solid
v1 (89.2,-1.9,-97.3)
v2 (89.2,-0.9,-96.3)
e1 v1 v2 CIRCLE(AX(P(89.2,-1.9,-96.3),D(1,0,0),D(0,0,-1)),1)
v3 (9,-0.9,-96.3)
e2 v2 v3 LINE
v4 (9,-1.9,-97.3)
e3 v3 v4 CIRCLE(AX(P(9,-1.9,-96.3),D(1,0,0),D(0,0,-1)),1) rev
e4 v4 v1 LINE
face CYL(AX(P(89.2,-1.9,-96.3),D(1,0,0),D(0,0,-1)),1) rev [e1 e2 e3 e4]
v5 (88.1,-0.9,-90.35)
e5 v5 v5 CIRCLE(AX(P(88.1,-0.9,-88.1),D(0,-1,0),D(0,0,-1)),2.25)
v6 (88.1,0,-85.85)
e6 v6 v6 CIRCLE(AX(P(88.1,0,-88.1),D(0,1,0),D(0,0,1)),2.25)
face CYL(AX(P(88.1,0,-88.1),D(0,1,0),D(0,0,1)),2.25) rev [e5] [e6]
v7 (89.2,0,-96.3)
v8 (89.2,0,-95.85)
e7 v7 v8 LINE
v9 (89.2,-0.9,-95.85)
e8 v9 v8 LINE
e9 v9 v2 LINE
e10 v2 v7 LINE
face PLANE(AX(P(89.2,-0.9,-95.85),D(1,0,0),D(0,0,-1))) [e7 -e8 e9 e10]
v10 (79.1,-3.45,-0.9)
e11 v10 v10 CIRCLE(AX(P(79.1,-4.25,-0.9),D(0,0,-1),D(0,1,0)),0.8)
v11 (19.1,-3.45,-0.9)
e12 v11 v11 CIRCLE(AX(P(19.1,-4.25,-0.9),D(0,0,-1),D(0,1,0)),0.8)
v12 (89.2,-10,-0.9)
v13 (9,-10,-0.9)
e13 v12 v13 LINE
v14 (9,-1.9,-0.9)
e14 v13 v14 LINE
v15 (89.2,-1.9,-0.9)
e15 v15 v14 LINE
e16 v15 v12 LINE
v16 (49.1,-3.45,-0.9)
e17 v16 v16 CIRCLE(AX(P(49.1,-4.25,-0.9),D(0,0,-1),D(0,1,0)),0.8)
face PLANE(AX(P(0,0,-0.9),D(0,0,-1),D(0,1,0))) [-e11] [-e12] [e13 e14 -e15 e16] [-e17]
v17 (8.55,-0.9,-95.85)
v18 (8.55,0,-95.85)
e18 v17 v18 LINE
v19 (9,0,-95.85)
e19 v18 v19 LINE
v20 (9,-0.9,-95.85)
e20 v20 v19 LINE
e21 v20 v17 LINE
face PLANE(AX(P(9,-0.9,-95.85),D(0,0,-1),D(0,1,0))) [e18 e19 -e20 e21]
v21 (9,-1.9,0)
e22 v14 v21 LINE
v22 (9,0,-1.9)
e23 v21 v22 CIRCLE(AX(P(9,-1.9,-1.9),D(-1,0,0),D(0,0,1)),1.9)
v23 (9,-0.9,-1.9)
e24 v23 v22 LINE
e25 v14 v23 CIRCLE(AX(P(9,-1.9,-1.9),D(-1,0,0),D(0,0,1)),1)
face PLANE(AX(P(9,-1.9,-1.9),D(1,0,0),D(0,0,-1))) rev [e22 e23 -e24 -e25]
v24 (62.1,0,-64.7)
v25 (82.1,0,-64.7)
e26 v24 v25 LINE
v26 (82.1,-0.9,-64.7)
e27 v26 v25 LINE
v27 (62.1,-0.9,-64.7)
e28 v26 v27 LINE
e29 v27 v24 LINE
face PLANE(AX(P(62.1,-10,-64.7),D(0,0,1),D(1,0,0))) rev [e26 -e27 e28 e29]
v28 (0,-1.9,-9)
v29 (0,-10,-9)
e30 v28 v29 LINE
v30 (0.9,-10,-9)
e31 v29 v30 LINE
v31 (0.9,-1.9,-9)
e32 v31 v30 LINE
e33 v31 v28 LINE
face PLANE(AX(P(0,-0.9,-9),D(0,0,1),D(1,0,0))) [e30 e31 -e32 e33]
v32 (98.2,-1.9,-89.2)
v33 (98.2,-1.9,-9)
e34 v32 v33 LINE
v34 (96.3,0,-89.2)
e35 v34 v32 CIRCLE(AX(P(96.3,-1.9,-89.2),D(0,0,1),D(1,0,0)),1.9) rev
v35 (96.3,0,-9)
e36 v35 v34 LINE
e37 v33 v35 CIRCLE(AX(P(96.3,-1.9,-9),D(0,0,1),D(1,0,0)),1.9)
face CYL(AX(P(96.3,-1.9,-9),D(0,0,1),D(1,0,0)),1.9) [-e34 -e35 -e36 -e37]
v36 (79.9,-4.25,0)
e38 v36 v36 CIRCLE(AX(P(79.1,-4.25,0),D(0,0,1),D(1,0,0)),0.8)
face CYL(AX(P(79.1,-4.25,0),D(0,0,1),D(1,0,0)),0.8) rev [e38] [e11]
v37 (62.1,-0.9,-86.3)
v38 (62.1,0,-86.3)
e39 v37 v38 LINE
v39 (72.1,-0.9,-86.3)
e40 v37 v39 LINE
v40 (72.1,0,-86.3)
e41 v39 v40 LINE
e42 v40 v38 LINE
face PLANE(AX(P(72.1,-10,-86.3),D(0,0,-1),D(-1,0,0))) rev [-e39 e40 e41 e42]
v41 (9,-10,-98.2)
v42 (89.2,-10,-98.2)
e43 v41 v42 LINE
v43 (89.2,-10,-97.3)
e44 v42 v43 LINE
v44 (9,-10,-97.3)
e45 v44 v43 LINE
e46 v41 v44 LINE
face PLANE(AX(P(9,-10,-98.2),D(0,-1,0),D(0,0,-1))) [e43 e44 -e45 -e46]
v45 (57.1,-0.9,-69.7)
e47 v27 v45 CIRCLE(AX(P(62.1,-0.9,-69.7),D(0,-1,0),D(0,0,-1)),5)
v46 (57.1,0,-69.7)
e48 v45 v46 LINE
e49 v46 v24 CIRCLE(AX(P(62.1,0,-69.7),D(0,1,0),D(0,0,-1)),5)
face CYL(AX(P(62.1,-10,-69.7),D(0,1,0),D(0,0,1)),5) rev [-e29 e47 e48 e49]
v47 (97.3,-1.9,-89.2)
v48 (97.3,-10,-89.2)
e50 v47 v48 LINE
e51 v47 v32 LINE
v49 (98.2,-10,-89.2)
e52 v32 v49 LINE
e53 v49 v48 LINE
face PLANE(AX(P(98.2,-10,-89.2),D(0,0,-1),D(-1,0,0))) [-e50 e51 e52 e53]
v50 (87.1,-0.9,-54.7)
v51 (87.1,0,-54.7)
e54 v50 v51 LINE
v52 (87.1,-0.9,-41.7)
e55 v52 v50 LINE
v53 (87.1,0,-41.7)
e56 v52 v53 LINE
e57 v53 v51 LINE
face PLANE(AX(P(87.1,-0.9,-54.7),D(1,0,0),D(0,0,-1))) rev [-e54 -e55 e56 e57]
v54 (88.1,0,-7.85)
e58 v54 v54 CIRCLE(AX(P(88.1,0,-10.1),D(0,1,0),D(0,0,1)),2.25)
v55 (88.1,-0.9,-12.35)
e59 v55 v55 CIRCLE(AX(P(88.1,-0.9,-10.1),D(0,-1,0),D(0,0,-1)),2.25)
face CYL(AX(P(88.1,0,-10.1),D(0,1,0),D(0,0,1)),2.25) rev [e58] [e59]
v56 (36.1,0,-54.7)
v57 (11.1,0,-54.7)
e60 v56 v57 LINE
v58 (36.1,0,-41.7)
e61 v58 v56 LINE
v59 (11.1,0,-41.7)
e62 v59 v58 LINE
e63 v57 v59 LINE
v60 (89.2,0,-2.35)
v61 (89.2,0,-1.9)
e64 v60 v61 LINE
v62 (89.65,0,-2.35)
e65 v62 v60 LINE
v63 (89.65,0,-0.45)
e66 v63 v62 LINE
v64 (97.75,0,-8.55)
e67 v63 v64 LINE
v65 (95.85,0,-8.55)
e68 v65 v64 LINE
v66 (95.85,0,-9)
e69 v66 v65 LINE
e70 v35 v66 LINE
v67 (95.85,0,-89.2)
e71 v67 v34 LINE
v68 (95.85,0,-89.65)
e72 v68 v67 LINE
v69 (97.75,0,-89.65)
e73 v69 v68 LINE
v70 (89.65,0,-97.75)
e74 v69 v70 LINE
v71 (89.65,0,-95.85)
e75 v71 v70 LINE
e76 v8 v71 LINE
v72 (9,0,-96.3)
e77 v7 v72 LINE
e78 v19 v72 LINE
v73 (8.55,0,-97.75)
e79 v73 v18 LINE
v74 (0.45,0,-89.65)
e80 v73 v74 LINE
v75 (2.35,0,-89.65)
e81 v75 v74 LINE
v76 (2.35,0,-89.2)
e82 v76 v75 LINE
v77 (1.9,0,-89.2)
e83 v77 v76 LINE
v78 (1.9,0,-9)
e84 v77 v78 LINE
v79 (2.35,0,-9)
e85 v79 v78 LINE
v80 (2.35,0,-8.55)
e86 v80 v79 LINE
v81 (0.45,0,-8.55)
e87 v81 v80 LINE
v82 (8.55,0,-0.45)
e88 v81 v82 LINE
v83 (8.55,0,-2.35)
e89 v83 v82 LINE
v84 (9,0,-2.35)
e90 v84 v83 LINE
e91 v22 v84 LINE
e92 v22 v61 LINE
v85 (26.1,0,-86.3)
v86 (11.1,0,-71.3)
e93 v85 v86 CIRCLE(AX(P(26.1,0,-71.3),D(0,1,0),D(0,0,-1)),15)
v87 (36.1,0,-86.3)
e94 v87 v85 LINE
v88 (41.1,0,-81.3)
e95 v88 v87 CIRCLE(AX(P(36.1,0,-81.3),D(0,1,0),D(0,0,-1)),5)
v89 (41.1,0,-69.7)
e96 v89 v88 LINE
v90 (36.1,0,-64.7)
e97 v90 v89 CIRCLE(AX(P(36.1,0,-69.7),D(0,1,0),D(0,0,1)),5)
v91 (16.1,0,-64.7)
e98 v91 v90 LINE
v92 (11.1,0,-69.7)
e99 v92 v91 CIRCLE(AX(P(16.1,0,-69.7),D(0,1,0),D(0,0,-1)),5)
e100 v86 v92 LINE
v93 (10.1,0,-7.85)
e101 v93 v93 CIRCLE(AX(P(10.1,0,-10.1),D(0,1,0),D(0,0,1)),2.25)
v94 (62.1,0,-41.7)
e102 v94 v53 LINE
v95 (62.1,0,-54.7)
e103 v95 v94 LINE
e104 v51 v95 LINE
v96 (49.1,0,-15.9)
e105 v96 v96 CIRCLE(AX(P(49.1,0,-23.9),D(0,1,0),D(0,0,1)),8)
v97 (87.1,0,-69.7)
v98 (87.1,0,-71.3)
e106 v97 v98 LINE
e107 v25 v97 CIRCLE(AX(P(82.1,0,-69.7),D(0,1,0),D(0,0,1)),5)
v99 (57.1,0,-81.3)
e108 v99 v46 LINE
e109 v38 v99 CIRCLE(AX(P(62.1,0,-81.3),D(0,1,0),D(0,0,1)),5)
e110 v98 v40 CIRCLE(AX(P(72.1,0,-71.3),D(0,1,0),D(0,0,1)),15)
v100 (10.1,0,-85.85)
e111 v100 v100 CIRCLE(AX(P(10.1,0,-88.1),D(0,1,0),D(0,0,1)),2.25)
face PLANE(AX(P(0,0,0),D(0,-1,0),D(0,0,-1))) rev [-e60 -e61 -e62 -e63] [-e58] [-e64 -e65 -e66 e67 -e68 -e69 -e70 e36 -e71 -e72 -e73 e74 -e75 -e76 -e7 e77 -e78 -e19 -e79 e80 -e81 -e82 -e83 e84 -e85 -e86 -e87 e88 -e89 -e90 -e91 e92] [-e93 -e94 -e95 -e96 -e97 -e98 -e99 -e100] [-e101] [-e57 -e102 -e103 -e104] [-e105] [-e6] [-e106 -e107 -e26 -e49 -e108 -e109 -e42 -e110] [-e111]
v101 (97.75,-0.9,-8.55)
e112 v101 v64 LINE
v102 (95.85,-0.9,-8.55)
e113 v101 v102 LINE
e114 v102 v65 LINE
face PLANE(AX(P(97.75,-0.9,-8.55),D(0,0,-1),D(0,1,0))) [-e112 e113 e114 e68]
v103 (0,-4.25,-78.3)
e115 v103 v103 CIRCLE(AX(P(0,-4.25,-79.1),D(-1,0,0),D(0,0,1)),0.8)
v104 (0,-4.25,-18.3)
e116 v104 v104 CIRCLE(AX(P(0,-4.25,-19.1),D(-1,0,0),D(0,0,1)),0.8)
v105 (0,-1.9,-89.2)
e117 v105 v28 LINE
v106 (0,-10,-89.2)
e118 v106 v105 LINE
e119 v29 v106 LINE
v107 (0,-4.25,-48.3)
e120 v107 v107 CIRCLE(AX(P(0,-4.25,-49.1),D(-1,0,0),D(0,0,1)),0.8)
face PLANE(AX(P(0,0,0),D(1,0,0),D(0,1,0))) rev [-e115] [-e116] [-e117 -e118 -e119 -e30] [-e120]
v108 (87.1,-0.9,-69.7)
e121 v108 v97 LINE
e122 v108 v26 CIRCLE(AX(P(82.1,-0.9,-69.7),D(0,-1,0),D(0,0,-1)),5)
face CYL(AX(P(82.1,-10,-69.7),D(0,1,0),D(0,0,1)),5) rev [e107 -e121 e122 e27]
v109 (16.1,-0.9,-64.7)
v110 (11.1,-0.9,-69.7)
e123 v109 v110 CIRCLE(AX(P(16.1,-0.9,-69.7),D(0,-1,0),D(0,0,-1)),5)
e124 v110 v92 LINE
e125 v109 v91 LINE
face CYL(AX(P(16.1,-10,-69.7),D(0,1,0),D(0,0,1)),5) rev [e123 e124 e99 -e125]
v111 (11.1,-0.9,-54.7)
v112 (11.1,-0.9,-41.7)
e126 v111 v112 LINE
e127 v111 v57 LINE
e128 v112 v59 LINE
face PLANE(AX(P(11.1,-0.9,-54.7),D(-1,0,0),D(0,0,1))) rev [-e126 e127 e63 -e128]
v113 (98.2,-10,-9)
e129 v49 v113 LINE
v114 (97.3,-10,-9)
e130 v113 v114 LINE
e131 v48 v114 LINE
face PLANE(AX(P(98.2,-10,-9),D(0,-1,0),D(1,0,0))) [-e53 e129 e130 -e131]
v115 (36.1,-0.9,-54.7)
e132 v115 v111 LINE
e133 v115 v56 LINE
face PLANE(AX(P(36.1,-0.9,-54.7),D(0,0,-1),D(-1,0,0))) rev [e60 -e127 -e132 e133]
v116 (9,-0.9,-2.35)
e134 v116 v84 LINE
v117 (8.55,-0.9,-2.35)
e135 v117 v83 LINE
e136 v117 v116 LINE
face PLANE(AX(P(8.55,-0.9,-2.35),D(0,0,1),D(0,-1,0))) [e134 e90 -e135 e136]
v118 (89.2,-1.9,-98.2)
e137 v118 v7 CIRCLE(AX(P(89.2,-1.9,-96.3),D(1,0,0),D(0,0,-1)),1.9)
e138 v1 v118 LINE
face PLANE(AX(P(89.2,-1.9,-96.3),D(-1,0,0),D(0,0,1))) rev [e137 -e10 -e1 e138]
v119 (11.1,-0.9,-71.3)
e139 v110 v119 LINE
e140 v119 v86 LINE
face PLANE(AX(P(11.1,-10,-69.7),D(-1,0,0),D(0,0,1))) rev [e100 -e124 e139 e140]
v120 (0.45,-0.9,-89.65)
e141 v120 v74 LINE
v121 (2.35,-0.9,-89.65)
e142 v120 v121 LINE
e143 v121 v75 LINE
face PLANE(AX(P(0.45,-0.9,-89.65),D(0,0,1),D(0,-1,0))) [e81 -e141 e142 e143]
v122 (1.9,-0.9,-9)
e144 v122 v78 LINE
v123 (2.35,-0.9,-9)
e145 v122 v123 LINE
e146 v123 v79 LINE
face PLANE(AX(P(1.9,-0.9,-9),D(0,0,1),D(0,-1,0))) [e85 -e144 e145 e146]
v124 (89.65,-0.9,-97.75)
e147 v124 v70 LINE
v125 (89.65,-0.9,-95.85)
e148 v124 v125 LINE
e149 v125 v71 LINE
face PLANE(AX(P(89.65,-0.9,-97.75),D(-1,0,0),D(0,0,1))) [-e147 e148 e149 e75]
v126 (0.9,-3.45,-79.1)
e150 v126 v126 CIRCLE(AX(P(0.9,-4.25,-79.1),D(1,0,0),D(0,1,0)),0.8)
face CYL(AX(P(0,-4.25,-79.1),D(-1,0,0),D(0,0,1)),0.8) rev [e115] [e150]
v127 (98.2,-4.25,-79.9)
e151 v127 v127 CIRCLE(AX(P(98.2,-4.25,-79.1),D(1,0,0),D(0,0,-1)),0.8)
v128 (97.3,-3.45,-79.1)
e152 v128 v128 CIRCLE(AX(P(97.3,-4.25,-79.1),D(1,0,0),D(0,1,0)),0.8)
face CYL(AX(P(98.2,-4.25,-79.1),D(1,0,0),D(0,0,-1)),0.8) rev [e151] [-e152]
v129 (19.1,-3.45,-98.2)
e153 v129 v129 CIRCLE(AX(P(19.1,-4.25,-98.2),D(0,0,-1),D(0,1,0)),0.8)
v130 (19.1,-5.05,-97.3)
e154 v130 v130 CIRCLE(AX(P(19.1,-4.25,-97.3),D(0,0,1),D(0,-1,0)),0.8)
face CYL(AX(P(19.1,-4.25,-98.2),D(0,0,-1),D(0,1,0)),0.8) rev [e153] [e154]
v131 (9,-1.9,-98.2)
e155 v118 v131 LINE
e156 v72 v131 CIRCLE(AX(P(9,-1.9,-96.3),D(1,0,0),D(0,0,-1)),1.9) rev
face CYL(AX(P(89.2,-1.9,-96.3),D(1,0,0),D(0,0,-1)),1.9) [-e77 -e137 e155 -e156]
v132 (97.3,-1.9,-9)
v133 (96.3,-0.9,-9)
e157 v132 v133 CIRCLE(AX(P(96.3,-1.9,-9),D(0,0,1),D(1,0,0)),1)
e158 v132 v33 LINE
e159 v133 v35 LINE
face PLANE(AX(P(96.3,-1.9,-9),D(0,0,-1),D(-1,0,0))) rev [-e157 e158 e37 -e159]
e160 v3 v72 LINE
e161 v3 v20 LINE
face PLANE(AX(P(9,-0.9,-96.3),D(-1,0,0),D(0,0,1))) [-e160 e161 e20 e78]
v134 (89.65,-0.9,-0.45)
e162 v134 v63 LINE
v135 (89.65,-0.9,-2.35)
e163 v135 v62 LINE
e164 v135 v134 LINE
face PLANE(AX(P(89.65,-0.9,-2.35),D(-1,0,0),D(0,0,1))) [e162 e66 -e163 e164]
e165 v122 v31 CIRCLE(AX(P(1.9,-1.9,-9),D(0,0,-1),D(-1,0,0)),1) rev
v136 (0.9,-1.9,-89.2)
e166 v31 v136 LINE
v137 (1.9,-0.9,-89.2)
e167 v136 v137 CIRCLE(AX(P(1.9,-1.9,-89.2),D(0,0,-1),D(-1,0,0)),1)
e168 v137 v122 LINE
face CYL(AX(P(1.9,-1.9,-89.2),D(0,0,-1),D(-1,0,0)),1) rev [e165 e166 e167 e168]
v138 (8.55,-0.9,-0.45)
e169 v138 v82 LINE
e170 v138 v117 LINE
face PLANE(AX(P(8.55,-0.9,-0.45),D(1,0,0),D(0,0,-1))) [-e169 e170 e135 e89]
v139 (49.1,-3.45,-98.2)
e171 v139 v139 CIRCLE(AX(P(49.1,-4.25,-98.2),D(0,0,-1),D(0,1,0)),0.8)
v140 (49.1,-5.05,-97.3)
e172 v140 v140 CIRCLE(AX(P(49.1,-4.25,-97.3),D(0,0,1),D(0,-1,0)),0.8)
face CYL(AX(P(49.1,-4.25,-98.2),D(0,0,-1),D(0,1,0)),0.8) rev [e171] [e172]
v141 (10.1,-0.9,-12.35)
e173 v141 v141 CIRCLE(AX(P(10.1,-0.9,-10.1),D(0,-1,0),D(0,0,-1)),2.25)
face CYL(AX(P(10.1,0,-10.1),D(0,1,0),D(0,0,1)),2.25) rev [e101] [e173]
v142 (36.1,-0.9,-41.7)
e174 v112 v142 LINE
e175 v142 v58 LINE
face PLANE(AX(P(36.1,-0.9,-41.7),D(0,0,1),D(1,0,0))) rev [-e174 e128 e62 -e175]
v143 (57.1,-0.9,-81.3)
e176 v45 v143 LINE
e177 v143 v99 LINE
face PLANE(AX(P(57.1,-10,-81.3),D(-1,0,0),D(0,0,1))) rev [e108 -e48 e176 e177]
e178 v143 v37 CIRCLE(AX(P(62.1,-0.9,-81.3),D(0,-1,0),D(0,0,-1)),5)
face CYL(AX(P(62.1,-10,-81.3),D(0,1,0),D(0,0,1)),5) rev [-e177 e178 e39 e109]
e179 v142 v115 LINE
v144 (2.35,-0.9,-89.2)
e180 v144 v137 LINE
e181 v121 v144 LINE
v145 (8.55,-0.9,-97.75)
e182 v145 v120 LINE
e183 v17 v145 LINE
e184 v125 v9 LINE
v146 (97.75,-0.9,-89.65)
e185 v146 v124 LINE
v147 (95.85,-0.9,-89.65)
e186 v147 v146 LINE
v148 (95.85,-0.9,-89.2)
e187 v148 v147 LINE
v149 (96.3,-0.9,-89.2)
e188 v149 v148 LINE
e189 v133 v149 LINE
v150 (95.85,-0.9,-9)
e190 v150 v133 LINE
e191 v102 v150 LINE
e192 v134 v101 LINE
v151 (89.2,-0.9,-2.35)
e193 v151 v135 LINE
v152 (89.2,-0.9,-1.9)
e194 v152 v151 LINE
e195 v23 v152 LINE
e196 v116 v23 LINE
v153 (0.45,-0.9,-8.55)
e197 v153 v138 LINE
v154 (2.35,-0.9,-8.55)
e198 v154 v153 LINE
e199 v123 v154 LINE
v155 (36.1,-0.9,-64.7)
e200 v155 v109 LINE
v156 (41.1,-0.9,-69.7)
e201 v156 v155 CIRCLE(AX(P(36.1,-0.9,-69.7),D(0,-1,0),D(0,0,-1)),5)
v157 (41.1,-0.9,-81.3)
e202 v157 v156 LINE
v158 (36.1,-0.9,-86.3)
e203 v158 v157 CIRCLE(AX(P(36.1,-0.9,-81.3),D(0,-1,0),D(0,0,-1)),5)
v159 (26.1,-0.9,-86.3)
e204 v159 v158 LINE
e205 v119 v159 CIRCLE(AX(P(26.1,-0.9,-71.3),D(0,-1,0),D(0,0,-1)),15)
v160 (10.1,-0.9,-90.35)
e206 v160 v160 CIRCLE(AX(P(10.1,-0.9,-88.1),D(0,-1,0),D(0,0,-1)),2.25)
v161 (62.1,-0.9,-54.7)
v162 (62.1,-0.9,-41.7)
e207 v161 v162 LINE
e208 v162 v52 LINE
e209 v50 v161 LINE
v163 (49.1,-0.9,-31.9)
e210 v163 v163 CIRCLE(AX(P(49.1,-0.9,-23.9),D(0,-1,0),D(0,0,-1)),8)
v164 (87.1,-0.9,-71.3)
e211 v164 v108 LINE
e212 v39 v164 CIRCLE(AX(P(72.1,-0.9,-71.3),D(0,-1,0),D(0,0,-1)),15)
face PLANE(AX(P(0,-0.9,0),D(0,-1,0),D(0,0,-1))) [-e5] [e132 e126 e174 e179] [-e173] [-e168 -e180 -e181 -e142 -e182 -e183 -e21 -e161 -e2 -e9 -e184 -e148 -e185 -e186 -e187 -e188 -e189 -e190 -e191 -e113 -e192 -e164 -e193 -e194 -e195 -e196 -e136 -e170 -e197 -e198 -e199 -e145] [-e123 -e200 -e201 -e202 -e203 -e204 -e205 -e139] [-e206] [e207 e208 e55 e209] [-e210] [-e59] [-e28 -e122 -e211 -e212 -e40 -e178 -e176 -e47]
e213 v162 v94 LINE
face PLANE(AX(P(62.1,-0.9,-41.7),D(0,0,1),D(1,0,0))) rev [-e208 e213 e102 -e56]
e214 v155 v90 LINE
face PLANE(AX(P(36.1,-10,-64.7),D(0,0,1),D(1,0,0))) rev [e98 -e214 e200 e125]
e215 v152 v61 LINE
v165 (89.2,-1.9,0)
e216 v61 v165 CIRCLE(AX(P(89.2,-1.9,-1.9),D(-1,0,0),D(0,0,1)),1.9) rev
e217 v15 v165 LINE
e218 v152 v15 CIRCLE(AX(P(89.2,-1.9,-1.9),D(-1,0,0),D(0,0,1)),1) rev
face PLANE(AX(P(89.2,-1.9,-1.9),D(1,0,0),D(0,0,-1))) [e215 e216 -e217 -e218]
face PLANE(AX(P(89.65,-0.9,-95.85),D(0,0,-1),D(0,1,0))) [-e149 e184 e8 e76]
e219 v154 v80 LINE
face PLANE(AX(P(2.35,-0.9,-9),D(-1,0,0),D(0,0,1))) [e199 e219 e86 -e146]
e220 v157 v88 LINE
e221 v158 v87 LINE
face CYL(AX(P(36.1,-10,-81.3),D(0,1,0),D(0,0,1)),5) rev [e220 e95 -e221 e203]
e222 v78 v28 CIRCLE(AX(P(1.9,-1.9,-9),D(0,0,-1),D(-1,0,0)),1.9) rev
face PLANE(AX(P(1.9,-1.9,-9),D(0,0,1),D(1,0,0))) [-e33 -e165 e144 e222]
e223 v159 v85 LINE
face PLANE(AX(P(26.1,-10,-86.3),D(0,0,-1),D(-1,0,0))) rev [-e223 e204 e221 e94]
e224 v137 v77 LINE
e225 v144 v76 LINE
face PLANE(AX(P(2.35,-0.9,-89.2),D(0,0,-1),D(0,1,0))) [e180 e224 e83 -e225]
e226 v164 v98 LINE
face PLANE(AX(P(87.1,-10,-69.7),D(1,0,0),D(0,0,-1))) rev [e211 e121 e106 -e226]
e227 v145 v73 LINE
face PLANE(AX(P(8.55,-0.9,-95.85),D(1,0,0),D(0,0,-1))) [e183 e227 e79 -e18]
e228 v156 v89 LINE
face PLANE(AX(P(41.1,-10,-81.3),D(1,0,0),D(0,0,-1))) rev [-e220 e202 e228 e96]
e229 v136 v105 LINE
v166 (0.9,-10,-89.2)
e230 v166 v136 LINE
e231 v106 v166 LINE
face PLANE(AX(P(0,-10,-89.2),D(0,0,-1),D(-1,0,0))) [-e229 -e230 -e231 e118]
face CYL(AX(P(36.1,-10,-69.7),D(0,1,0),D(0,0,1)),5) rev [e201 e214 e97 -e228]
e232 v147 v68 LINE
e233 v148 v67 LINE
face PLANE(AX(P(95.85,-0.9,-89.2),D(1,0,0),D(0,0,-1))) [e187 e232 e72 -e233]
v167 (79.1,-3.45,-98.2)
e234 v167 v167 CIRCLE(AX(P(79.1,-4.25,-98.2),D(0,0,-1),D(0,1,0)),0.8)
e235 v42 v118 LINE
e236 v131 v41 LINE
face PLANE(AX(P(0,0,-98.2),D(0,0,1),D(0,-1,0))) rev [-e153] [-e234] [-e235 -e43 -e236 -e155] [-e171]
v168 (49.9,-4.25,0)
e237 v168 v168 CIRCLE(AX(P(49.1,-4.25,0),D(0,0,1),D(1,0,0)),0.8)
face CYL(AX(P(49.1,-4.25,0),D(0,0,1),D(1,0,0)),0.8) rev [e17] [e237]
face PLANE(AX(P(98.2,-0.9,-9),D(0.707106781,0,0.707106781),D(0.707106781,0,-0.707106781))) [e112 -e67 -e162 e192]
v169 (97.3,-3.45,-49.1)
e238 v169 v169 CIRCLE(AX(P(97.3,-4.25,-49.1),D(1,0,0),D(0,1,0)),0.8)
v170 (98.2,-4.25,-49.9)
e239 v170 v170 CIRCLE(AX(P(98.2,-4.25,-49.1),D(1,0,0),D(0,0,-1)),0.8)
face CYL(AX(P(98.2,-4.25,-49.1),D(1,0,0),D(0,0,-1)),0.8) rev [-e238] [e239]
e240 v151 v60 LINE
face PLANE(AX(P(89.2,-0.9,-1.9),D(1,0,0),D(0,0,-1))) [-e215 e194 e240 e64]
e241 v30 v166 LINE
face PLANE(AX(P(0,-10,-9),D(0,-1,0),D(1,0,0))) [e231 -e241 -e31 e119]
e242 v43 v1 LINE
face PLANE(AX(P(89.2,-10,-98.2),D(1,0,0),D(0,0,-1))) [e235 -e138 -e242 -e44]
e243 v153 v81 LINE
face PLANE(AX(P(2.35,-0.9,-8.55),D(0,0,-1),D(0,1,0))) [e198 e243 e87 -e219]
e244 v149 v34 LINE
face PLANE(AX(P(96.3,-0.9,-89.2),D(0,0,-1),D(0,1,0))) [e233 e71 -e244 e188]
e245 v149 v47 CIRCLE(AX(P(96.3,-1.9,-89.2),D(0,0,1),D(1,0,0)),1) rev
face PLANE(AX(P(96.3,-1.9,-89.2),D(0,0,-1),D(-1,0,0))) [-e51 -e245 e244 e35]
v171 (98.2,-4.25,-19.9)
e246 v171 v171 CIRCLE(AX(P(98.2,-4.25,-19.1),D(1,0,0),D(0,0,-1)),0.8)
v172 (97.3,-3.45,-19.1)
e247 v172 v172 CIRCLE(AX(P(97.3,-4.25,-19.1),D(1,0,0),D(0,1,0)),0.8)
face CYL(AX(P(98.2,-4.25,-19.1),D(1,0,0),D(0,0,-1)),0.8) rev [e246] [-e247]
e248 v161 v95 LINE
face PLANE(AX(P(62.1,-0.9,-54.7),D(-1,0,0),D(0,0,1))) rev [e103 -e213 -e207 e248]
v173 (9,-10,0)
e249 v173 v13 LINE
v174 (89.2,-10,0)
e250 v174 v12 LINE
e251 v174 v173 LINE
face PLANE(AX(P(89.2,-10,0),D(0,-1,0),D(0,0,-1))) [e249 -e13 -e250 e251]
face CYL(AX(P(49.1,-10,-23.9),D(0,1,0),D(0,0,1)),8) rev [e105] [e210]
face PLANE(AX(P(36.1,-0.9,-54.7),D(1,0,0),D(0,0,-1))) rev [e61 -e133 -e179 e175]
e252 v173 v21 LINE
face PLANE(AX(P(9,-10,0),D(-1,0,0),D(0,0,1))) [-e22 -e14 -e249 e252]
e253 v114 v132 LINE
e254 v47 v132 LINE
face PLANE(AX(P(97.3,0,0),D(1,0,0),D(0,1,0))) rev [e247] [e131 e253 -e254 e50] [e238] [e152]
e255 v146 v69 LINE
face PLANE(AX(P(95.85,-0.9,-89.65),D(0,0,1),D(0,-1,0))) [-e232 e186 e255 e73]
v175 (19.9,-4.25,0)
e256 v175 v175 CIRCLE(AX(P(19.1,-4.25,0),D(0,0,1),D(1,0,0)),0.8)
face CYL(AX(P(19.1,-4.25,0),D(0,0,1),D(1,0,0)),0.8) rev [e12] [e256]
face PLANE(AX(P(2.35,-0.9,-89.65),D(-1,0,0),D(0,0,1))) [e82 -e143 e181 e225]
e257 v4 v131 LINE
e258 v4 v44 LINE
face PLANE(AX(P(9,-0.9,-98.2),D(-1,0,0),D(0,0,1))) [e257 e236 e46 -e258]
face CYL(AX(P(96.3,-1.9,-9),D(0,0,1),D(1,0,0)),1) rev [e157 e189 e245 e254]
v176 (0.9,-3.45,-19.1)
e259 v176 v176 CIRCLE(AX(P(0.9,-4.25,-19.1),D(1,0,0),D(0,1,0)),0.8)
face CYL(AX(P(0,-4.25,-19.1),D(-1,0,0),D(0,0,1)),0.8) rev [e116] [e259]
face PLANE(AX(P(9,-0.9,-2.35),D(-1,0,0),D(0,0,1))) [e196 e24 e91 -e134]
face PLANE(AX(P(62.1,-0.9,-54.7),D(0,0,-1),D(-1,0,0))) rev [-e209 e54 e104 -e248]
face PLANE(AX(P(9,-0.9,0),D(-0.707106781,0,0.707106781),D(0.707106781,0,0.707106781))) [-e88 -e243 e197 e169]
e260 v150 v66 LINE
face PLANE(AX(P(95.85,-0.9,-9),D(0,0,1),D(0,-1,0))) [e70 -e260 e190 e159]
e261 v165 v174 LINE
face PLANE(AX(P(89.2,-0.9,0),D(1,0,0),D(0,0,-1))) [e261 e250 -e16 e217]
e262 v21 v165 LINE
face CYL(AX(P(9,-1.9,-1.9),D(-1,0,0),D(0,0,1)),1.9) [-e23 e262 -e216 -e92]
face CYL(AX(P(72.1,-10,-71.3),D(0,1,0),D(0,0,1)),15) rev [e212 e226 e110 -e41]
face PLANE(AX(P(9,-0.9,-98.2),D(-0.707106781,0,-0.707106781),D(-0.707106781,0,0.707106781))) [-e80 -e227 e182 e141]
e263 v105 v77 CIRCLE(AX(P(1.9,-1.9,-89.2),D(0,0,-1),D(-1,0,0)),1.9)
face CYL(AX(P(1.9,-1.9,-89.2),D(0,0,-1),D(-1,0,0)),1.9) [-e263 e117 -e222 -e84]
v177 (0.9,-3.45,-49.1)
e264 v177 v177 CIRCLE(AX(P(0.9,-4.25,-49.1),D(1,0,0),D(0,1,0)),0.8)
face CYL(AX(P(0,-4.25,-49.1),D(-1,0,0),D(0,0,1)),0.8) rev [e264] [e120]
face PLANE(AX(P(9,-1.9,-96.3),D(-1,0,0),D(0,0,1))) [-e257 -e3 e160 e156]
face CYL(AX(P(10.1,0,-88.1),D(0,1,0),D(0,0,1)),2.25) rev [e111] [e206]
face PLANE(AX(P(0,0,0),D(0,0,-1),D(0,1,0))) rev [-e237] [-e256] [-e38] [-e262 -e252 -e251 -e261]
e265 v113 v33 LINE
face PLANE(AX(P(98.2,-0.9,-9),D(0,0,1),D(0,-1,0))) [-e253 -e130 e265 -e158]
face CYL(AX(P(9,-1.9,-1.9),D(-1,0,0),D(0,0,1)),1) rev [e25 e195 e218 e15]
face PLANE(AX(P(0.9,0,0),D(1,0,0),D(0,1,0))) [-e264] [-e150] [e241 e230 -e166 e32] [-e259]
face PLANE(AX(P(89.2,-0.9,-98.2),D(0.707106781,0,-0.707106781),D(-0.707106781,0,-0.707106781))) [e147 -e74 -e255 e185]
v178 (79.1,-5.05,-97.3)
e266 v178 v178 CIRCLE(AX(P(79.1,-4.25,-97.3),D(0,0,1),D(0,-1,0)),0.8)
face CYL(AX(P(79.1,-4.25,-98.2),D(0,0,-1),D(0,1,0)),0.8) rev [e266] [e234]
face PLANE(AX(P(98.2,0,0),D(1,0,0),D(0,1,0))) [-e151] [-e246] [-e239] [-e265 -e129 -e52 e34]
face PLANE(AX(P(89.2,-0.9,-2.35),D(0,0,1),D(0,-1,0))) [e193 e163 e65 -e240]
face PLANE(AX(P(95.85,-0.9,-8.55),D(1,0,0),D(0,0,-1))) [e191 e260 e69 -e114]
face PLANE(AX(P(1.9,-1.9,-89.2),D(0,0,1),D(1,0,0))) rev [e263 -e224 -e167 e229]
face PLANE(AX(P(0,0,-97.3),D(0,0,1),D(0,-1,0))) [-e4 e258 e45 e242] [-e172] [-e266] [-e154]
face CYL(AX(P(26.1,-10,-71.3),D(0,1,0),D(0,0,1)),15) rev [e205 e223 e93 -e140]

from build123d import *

# Parameters (mm, degrees)
SKETCH1_W                       = 25
SKETCH1_H                       = 13
BASE_FLANGE1_DEPTH              = 0.9
EDGE_FLANGE1_STRIP_W            = 5.6
EDGE_FLANGE1_STRIP_H            = 0.9
EDGE_FLANGE1_STRIP_CUT_DEPTH    = 80.2
EDGE_FLANGE1_RELIEF_W           = 6.05
EDGE_FLANGE1_RELIEF_H           = 0.45
EDGE_FLANGE1_RELIEF_CUT_DEPTH   = 0.9
EDGE_FLANGE1_STRIP_2_W          = 5.6
EDGE_FLANGE1_STRIP_2_H          = 0.9
EDGE_FLANGE1_STRIP_CUT_2_DEPTH  = 80.2
EDGE_FLANGE1_RELIEF_2_W         = 6.05
EDGE_FLANGE1_RELIEF_2_H         = 0.45
EDGE_FLANGE1_RELIEF_CUT_2_DEPTH = 0.9
EDGE_FLANGE1_STRIP_3_W          = 5.6
EDGE_FLANGE1_STRIP_3_H          = 0.9
EDGE_FLANGE1_STRIP_CUT_3_DEPTH  = 80.2
EDGE_FLANGE1_RELIEF_3_W         = 6.05
EDGE_FLANGE1_RELIEF_3_H         = 0.45
EDGE_FLANGE1_RELIEF_CUT_3_DEPTH = 0.9
EDGE_FLANGE1_STRIP_4_W          = 5.6
EDGE_FLANGE1_STRIP_4_H          = 0.9
EDGE_FLANGE1_STRIP_CUT_4_DEPTH  = 80.2
EDGE_FLANGE1_RELIEF_4_W         = 6.05
EDGE_FLANGE1_RELIEF_4_H         = 0.45
EDGE_FLANGE1_RELIEF_CUT_4_DEPTH = 0.9
EDGE_FLANGE1_DEPTH              = 80.2
EDGE_FLANGE1_BEND_DEPTH         = 80.2
EDGE_FLANGE1_BEND_2_DEPTH       = 80.2
EDGE_FLANGE1_BEND_3_DEPTH       = 80.2
SKETCH18_R                      = 8
CUT_EXTRUDE1_DEPTH              = 10
M2X0_4_TAPPED_HOLE1_D           = 1.6
M2X0_4_TAPPED_HOLE1_DEPTH       = 5.2
M2X0_4_TAPPED_HOLE1_TIP         = 0.480688495
M2X0_4_TAPPED_HOLE2_D           = 1.6
M2X0_4_TAPPED_HOLE2_DEPTH       = 5.2
M2X0_4_TAPPED_HOLE2_TIP         = 0.480688495
M2X0_4_TAPPED_HOLE3_D           = 1.6
M2X0_4_TAPPED_HOLE3_DEPTH       = 5.2
M2X0_4_TAPPED_HOLE3_TIP         = 0.480688495
M2X0_4_TAPPED_HOLE4_D           = 1.6
M2X0_4_TAPPED_HOLE4_DEPTH       = 5.2
M2X0_4_TAPPED_HOLE4_TIP         = 0.480688495
M4_CLEARANCE_HOLE1_D            = 4.5


# Sheet-metal steps are written as plain solids
with BuildPart() as part:
    # Sketch1 → Base-Flange1 (new body)
    with BuildSketch(Plane(origin=(0, 0, 0), x_dir=(1, 0, 0), z_dir=(0, 1, 0))):
        Polygon((9, 98.2), (0, 89.2), (0, 9), (9, 0), (89.2, 0), (98.2, 9), (98.2, 89.2), (89.2, 98.2), align=None)
        with Locations((74.6, 48.2)):
            Rectangle(SKETCH1_W, SKETCH1_H, mode=Mode.SUBTRACT)
        with Locations((23.6, 48.2)):
            Rectangle(SKETCH1_W, SKETCH1_H, mode=Mode.SUBTRACT)
    extrude(amount=-BASE_FLANGE1_DEPTH)

    # Edge-Flange1 strip (across the edge) → Edge-Flange1 strip cut (cut)
    with BuildSketch(Plane(origin=(98.2, -0.9, -89.2), x_dir=(-1, 0, 0), z_dir=(0, 0, 1))):
        with Locations((-0.9, -0.45)):
            Rectangle(EDGE_FLANGE1_STRIP_W, EDGE_FLANGE1_STRIP_H)
    extrude(amount=EDGE_FLANGE1_STRIP_CUT_DEPTH, mode=Mode.SUBTRACT)

    # Edge-Flange1 relief (on the sheet) → Edge-Flange1 relief cut (cut)
    with BuildSketch(Plane(origin=(96.3, -0.9, -89.2), x_dir=(-1, 0, 0), z_dir=(0, -1, 0))):
        with Locations((-2.575, 0.225)):
            Rectangle(EDGE_FLANGE1_RELIEF_W, EDGE_FLANGE1_RELIEF_H)
        with Locations((-2.575, -80.425)):
            Rectangle(EDGE_FLANGE1_RELIEF_W, EDGE_FLANGE1_RELIEF_H)
    extrude(amount=-EDGE_FLANGE1_RELIEF_CUT_DEPTH, mode=Mode.SUBTRACT)

    # Edge-Flange1 strip 2 (across the edge) → Edge-Flange1 strip cut 2 (cut)
    with BuildSketch(Plane(origin=(89.2, -0.9, 0), x_dir=(0, 0, -1), z_dir=(-1, 0, 0))):
        with Locations((-0.9, -0.45)):
            Rectangle(EDGE_FLANGE1_STRIP_2_W, EDGE_FLANGE1_STRIP_2_H)
    extrude(amount=EDGE_FLANGE1_STRIP_CUT_2_DEPTH, mode=Mode.SUBTRACT)

    # Edge-Flange1 relief 2 (on the sheet) → Edge-Flange1 relief cut 2 (cut)
    with BuildSketch(Plane(origin=(89.2, -0.9, -1.9), x_dir=(0, 0, -1), z_dir=(0, -1, 0))):
        with Locations((-2.575, 0.225)):
            Rectangle(EDGE_FLANGE1_RELIEF_2_W, EDGE_FLANGE1_RELIEF_2_H)
        with Locations((-2.575, -80.425)):
            Rectangle(EDGE_FLANGE1_RELIEF_2_W, EDGE_FLANGE1_RELIEF_2_H)
    extrude(amount=-EDGE_FLANGE1_RELIEF_CUT_2_DEPTH, mode=Mode.SUBTRACT)

    # Edge-Flange1 strip 3 (across the edge) → Edge-Flange1 strip cut 3 (cut)
    with BuildSketch(Plane(origin=(0, -0.9, -9), x_dir=(1, 0, 0), z_dir=(0, 0, -1))):
        with Locations((-0.9, -0.45)):
            Rectangle(EDGE_FLANGE1_STRIP_3_W, EDGE_FLANGE1_STRIP_3_H)
    extrude(amount=EDGE_FLANGE1_STRIP_CUT_3_DEPTH, mode=Mode.SUBTRACT)

    # Edge-Flange1 relief 3 (on the sheet) → Edge-Flange1 relief cut 3 (cut)
    with BuildSketch(Plane(origin=(1.9, -0.9, -9), x_dir=(1, 0, 0), z_dir=(0, -1, 0))):
        with Locations((-2.575, 0.225)):
            Rectangle(EDGE_FLANGE1_RELIEF_3_W, EDGE_FLANGE1_RELIEF_3_H)
        with Locations((-2.575, -80.425)):
            Rectangle(EDGE_FLANGE1_RELIEF_3_W, EDGE_FLANGE1_RELIEF_3_H)
    extrude(amount=-EDGE_FLANGE1_RELIEF_CUT_3_DEPTH, mode=Mode.SUBTRACT)

    # Edge-Flange1 strip 4 (across the edge) → Edge-Flange1 strip cut 4 (cut)
    with BuildSketch(Plane(origin=(9, -0.9, -98.2), x_dir=(0, 0, 1), z_dir=(1, 0, 0))):
        with Locations((-0.9, -0.45)):
            Rectangle(EDGE_FLANGE1_STRIP_4_W, EDGE_FLANGE1_STRIP_4_H)
    extrude(amount=EDGE_FLANGE1_STRIP_CUT_4_DEPTH, mode=Mode.SUBTRACT)

    # Edge-Flange1 relief 4 (on the sheet) → Edge-Flange1 relief cut 4 (cut)
    with BuildSketch(Plane(origin=(9, -0.9, -96.3), x_dir=(0, 0, 1), z_dir=(0, -1, 0))):
        with Locations((-2.575, 0.225)):
            Rectangle(EDGE_FLANGE1_RELIEF_4_W, EDGE_FLANGE1_RELIEF_4_H)
        with Locations((-2.575, -80.425)):
            Rectangle(EDGE_FLANGE1_RELIEF_4_W, EDGE_FLANGE1_RELIEF_4_H)
    extrude(amount=-EDGE_FLANGE1_RELIEF_CUT_4_DEPTH, mode=Mode.SUBTRACT)

    # Edge-Flange1 section (across the edge) → Edge-Flange1 (add)
    with BuildSketch(Plane(origin=(98.2, -0.9, -89.2), x_dir=(-1, 0, 0), z_dir=(0, 0, 1))):
        with BuildLine():
            Line((0, 1), (0, 9.1))
            Line((0, 9.1), (0.9, 9.1))
            Line((0.9, 9.1), (0.9, 1))
            ThreePointArc((0.9, 1), (1.192893219, 0.292893219), (1.9, 0))
            Line((1.9, 0), (1.9, -0.9))
            ThreePointArc((1.9, -0.9), (0.556497116, -0.343502884), (0, 1))
        make_face()
    extrude(amount=EDGE_FLANGE1_DEPTH)

    # Edge-Flange1 section 2 (across the edge) → Edge-Flange1 bend (add)
    with BuildSketch(Plane(origin=(89.2, -0.9, 0), x_dir=(0, 0, -1), z_dir=(-1, 0, 0))):
        with BuildLine():
            Line((0, 1), (0, 9.1))
            Line((0, 9.1), (0.9, 9.1))
            Line((0.9, 9.1), (0.9, 1))
            ThreePointArc((0.9, 1), (1.192893219, 0.292893219), (1.9, 0))
            Line((1.9, 0), (1.9, -0.9))
            ThreePointArc((1.9, -0.9), (0.556497116, -0.343502884), (0, 1))
        make_face()
    extrude(amount=EDGE_FLANGE1_BEND_DEPTH)

    # Edge-Flange1 section 3 (across the edge) → Edge-Flange1 bend 2 (add)
    with BuildSketch(Plane(origin=(0, -0.9, -9), x_dir=(1, 0, 0), z_dir=(0, 0, -1))):
        with BuildLine():
            Line((0, 1), (0, 9.1))
            Line((0, 9.1), (0.9, 9.1))
            Line((0.9, 9.1), (0.9, 1))
            ThreePointArc((0.9, 1), (1.192893219, 0.292893219), (1.9, 0))
            Line((1.9, 0), (1.9, -0.9))
            ThreePointArc((1.9, -0.9), (0.556497116, -0.343502884), (0, 1))
        make_face()
    extrude(amount=EDGE_FLANGE1_BEND_2_DEPTH)

    # Edge-Flange1 section 4 (across the edge) → Edge-Flange1 bend 3 (add)
    with BuildSketch(Plane(origin=(9, -0.9, -98.2), x_dir=(0, 0, 1), z_dir=(1, 0, 0))):
        with BuildLine():
            Line((0, 1), (0, 9.1))
            Line((0, 9.1), (0.9, 9.1))
            Line((0.9, 9.1), (0.9, 1))
            ThreePointArc((0.9, 1), (1.192893219, 0.292893219), (1.9, 0))
            Line((1.9, 0), (1.9, -0.9))
            ThreePointArc((1.9, -0.9), (0.556497116, -0.343502884), (0, 1))
        make_face()
    extrude(amount=EDGE_FLANGE1_BEND_3_DEPTH)

    # Sketch18 → Cut-Extrude1 (cut)
    with BuildSketch(Plane(origin=(0, 0, 0), x_dir=(1, 0, 0), z_dir=(0, 1, 0))):
        with Locations(Location((49.1, 23.9, 0), (0, 0, 270))):
            Circle(SKETCH18_R)
        with BuildLine():
            Line((11.1, 69.7), (11.1, 71.3))
            ThreePointArc((11.1, 71.3), (15.493398282, 81.906601718), (26.1, 86.3))
            Line((26.1, 86.3), (36.1, 86.3))
            ThreePointArc((36.1, 86.3), (39.635533906, 84.835533906), (41.1, 81.3))
            Line((41.1, 81.3), (41.1, 69.7))
            ThreePointArc((41.1, 69.7), (39.635533906, 66.164466094), (36.1, 64.7))
            Line((36.1, 64.7), (16.1, 64.7))
            ThreePointArc((16.1, 64.7), (12.564466094, 66.164466094), (11.1, 69.7))
        make_face()
        with BuildLine():
            Line((62.1, 64.7), (82.1, 64.7))
            ThreePointArc((82.1, 64.7), (85.635533906, 66.164466094), (87.1, 69.7))
            Line((87.1, 69.7), (87.1, 71.3))
            ThreePointArc((87.1, 71.3), (82.706601718, 81.906601718), (72.1, 86.3))
            Line((72.1, 86.3), (62.1, 86.3))
            ThreePointArc((62.1, 86.3), (58.564466094, 84.835533906), (57.1, 81.3))
            Line((57.1, 81.3), (57.1, 69.7))
            ThreePointArc((57.1, 69.7), (58.564466094, 66.164466094), (62.1, 64.7))
        make_face()
    extrude(amount=-CUT_EXTRUDE1_DEPTH, mode=Mode.SUBTRACT)

    # M2x0.4 Tapped Hole1
    with Locations(Plane(origin=(102.384287404, -9.723815531, 0), x_dir=(1, 0, 0), z_dir=(0, 0, 1))):
        with Locations((-83.284287404, 5.473815531), (-53.284287404, 5.473815531), (-23.284287404, 5.473815531)):
            Hole(M2X0_4_TAPPED_HOLE1_D / 2, depth=M2X0_4_TAPPED_HOLE1_DEPTH)
            with Locations((0, 0, -(M2X0_4_TAPPED_HOLE1_DEPTH + M2X0_4_TAPPED_HOLE1_TIP / 2))):  # 118° drill point
                Cone(0, M2X0_4_TAPPED_HOLE1_D / 2, M2X0_4_TAPPED_HOLE1_TIP, mode=Mode.SUBTRACT)

    # M2x0.4 Tapped Hole2
    with Locations(Plane(origin=(0, -9.723815531, -74.008101688), x_dir=(0, 0, 1), z_dir=(-1, 0, 0))):
        with Locations((54.908101688, 5.473815531), (24.908101688, 5.473815531), (-5.091898312, 5.473815531)):
            Hole(M2X0_4_TAPPED_HOLE2_D / 2, depth=M2X0_4_TAPPED_HOLE2_DEPTH)
            with Locations((0, 0, -(M2X0_4_TAPPED_HOLE2_DEPTH + M2X0_4_TAPPED_HOLE2_TIP / 2))):  # 118° drill point
                Cone(0, M2X0_4_TAPPED_HOLE2_D / 2, M2X0_4_TAPPED_HOLE2_TIP, mode=Mode.SUBTRACT)

    # M2x0.4 Tapped Hole3
    with Locations(Plane(origin=(102.384287404, -9.723815531, -98.2), x_dir=(-1, 0, 0), z_dir=(0, 0, -1))):
        with Locations((23.284287404, 5.473815531), (53.284287404, 5.473815531), (83.284287404, 5.473815531)):
            Hole(M2X0_4_TAPPED_HOLE3_D / 2, depth=M2X0_4_TAPPED_HOLE3_DEPTH)
            with Locations((0, 0, -(M2X0_4_TAPPED_HOLE3_DEPTH + M2X0_4_TAPPED_HOLE3_TIP / 2))):  # 118° drill point
                Cone(0, M2X0_4_TAPPED_HOLE3_D / 2, M2X0_4_TAPPED_HOLE3_TIP, mode=Mode.SUBTRACT)

    # M2x0.4 Tapped Hole4
    with Locations(Plane(origin=(98.2, -9.723815531, -74.008101688), x_dir=(0, 0, -1), z_dir=(1, 0, 0))):
        with Locations((-24.908101688, 5.473815531), (5.091898312, 5.473815531), (-54.908101688, 5.473815531)):
            Hole(M2X0_4_TAPPED_HOLE4_D / 2, depth=M2X0_4_TAPPED_HOLE4_DEPTH)
            with Locations((0, 0, -(M2X0_4_TAPPED_HOLE4_DEPTH + M2X0_4_TAPPED_HOLE4_TIP / 2))):  # 118° drill point
                Cone(0, M2X0_4_TAPPED_HOLE4_D / 2, M2X0_4_TAPPED_HOLE4_TIP, mode=Mode.SUBTRACT)

    # M4 Clearance Hole1 (through all)
    with Locations(Plane(origin=(102.384287404, 0, -74.008101688), x_dir=(1, 0, 0), z_dir=(0, 1, 0))):
        with Locations((-92.284287404, 14.091898312), (-92.284287404, -63.908101688), (-14.284287404, -63.908101688), (-14.284287404, 14.091898312)):
            Hole(M4_CLEARANCE_HOLE1_D / 2)


solid = part.part
